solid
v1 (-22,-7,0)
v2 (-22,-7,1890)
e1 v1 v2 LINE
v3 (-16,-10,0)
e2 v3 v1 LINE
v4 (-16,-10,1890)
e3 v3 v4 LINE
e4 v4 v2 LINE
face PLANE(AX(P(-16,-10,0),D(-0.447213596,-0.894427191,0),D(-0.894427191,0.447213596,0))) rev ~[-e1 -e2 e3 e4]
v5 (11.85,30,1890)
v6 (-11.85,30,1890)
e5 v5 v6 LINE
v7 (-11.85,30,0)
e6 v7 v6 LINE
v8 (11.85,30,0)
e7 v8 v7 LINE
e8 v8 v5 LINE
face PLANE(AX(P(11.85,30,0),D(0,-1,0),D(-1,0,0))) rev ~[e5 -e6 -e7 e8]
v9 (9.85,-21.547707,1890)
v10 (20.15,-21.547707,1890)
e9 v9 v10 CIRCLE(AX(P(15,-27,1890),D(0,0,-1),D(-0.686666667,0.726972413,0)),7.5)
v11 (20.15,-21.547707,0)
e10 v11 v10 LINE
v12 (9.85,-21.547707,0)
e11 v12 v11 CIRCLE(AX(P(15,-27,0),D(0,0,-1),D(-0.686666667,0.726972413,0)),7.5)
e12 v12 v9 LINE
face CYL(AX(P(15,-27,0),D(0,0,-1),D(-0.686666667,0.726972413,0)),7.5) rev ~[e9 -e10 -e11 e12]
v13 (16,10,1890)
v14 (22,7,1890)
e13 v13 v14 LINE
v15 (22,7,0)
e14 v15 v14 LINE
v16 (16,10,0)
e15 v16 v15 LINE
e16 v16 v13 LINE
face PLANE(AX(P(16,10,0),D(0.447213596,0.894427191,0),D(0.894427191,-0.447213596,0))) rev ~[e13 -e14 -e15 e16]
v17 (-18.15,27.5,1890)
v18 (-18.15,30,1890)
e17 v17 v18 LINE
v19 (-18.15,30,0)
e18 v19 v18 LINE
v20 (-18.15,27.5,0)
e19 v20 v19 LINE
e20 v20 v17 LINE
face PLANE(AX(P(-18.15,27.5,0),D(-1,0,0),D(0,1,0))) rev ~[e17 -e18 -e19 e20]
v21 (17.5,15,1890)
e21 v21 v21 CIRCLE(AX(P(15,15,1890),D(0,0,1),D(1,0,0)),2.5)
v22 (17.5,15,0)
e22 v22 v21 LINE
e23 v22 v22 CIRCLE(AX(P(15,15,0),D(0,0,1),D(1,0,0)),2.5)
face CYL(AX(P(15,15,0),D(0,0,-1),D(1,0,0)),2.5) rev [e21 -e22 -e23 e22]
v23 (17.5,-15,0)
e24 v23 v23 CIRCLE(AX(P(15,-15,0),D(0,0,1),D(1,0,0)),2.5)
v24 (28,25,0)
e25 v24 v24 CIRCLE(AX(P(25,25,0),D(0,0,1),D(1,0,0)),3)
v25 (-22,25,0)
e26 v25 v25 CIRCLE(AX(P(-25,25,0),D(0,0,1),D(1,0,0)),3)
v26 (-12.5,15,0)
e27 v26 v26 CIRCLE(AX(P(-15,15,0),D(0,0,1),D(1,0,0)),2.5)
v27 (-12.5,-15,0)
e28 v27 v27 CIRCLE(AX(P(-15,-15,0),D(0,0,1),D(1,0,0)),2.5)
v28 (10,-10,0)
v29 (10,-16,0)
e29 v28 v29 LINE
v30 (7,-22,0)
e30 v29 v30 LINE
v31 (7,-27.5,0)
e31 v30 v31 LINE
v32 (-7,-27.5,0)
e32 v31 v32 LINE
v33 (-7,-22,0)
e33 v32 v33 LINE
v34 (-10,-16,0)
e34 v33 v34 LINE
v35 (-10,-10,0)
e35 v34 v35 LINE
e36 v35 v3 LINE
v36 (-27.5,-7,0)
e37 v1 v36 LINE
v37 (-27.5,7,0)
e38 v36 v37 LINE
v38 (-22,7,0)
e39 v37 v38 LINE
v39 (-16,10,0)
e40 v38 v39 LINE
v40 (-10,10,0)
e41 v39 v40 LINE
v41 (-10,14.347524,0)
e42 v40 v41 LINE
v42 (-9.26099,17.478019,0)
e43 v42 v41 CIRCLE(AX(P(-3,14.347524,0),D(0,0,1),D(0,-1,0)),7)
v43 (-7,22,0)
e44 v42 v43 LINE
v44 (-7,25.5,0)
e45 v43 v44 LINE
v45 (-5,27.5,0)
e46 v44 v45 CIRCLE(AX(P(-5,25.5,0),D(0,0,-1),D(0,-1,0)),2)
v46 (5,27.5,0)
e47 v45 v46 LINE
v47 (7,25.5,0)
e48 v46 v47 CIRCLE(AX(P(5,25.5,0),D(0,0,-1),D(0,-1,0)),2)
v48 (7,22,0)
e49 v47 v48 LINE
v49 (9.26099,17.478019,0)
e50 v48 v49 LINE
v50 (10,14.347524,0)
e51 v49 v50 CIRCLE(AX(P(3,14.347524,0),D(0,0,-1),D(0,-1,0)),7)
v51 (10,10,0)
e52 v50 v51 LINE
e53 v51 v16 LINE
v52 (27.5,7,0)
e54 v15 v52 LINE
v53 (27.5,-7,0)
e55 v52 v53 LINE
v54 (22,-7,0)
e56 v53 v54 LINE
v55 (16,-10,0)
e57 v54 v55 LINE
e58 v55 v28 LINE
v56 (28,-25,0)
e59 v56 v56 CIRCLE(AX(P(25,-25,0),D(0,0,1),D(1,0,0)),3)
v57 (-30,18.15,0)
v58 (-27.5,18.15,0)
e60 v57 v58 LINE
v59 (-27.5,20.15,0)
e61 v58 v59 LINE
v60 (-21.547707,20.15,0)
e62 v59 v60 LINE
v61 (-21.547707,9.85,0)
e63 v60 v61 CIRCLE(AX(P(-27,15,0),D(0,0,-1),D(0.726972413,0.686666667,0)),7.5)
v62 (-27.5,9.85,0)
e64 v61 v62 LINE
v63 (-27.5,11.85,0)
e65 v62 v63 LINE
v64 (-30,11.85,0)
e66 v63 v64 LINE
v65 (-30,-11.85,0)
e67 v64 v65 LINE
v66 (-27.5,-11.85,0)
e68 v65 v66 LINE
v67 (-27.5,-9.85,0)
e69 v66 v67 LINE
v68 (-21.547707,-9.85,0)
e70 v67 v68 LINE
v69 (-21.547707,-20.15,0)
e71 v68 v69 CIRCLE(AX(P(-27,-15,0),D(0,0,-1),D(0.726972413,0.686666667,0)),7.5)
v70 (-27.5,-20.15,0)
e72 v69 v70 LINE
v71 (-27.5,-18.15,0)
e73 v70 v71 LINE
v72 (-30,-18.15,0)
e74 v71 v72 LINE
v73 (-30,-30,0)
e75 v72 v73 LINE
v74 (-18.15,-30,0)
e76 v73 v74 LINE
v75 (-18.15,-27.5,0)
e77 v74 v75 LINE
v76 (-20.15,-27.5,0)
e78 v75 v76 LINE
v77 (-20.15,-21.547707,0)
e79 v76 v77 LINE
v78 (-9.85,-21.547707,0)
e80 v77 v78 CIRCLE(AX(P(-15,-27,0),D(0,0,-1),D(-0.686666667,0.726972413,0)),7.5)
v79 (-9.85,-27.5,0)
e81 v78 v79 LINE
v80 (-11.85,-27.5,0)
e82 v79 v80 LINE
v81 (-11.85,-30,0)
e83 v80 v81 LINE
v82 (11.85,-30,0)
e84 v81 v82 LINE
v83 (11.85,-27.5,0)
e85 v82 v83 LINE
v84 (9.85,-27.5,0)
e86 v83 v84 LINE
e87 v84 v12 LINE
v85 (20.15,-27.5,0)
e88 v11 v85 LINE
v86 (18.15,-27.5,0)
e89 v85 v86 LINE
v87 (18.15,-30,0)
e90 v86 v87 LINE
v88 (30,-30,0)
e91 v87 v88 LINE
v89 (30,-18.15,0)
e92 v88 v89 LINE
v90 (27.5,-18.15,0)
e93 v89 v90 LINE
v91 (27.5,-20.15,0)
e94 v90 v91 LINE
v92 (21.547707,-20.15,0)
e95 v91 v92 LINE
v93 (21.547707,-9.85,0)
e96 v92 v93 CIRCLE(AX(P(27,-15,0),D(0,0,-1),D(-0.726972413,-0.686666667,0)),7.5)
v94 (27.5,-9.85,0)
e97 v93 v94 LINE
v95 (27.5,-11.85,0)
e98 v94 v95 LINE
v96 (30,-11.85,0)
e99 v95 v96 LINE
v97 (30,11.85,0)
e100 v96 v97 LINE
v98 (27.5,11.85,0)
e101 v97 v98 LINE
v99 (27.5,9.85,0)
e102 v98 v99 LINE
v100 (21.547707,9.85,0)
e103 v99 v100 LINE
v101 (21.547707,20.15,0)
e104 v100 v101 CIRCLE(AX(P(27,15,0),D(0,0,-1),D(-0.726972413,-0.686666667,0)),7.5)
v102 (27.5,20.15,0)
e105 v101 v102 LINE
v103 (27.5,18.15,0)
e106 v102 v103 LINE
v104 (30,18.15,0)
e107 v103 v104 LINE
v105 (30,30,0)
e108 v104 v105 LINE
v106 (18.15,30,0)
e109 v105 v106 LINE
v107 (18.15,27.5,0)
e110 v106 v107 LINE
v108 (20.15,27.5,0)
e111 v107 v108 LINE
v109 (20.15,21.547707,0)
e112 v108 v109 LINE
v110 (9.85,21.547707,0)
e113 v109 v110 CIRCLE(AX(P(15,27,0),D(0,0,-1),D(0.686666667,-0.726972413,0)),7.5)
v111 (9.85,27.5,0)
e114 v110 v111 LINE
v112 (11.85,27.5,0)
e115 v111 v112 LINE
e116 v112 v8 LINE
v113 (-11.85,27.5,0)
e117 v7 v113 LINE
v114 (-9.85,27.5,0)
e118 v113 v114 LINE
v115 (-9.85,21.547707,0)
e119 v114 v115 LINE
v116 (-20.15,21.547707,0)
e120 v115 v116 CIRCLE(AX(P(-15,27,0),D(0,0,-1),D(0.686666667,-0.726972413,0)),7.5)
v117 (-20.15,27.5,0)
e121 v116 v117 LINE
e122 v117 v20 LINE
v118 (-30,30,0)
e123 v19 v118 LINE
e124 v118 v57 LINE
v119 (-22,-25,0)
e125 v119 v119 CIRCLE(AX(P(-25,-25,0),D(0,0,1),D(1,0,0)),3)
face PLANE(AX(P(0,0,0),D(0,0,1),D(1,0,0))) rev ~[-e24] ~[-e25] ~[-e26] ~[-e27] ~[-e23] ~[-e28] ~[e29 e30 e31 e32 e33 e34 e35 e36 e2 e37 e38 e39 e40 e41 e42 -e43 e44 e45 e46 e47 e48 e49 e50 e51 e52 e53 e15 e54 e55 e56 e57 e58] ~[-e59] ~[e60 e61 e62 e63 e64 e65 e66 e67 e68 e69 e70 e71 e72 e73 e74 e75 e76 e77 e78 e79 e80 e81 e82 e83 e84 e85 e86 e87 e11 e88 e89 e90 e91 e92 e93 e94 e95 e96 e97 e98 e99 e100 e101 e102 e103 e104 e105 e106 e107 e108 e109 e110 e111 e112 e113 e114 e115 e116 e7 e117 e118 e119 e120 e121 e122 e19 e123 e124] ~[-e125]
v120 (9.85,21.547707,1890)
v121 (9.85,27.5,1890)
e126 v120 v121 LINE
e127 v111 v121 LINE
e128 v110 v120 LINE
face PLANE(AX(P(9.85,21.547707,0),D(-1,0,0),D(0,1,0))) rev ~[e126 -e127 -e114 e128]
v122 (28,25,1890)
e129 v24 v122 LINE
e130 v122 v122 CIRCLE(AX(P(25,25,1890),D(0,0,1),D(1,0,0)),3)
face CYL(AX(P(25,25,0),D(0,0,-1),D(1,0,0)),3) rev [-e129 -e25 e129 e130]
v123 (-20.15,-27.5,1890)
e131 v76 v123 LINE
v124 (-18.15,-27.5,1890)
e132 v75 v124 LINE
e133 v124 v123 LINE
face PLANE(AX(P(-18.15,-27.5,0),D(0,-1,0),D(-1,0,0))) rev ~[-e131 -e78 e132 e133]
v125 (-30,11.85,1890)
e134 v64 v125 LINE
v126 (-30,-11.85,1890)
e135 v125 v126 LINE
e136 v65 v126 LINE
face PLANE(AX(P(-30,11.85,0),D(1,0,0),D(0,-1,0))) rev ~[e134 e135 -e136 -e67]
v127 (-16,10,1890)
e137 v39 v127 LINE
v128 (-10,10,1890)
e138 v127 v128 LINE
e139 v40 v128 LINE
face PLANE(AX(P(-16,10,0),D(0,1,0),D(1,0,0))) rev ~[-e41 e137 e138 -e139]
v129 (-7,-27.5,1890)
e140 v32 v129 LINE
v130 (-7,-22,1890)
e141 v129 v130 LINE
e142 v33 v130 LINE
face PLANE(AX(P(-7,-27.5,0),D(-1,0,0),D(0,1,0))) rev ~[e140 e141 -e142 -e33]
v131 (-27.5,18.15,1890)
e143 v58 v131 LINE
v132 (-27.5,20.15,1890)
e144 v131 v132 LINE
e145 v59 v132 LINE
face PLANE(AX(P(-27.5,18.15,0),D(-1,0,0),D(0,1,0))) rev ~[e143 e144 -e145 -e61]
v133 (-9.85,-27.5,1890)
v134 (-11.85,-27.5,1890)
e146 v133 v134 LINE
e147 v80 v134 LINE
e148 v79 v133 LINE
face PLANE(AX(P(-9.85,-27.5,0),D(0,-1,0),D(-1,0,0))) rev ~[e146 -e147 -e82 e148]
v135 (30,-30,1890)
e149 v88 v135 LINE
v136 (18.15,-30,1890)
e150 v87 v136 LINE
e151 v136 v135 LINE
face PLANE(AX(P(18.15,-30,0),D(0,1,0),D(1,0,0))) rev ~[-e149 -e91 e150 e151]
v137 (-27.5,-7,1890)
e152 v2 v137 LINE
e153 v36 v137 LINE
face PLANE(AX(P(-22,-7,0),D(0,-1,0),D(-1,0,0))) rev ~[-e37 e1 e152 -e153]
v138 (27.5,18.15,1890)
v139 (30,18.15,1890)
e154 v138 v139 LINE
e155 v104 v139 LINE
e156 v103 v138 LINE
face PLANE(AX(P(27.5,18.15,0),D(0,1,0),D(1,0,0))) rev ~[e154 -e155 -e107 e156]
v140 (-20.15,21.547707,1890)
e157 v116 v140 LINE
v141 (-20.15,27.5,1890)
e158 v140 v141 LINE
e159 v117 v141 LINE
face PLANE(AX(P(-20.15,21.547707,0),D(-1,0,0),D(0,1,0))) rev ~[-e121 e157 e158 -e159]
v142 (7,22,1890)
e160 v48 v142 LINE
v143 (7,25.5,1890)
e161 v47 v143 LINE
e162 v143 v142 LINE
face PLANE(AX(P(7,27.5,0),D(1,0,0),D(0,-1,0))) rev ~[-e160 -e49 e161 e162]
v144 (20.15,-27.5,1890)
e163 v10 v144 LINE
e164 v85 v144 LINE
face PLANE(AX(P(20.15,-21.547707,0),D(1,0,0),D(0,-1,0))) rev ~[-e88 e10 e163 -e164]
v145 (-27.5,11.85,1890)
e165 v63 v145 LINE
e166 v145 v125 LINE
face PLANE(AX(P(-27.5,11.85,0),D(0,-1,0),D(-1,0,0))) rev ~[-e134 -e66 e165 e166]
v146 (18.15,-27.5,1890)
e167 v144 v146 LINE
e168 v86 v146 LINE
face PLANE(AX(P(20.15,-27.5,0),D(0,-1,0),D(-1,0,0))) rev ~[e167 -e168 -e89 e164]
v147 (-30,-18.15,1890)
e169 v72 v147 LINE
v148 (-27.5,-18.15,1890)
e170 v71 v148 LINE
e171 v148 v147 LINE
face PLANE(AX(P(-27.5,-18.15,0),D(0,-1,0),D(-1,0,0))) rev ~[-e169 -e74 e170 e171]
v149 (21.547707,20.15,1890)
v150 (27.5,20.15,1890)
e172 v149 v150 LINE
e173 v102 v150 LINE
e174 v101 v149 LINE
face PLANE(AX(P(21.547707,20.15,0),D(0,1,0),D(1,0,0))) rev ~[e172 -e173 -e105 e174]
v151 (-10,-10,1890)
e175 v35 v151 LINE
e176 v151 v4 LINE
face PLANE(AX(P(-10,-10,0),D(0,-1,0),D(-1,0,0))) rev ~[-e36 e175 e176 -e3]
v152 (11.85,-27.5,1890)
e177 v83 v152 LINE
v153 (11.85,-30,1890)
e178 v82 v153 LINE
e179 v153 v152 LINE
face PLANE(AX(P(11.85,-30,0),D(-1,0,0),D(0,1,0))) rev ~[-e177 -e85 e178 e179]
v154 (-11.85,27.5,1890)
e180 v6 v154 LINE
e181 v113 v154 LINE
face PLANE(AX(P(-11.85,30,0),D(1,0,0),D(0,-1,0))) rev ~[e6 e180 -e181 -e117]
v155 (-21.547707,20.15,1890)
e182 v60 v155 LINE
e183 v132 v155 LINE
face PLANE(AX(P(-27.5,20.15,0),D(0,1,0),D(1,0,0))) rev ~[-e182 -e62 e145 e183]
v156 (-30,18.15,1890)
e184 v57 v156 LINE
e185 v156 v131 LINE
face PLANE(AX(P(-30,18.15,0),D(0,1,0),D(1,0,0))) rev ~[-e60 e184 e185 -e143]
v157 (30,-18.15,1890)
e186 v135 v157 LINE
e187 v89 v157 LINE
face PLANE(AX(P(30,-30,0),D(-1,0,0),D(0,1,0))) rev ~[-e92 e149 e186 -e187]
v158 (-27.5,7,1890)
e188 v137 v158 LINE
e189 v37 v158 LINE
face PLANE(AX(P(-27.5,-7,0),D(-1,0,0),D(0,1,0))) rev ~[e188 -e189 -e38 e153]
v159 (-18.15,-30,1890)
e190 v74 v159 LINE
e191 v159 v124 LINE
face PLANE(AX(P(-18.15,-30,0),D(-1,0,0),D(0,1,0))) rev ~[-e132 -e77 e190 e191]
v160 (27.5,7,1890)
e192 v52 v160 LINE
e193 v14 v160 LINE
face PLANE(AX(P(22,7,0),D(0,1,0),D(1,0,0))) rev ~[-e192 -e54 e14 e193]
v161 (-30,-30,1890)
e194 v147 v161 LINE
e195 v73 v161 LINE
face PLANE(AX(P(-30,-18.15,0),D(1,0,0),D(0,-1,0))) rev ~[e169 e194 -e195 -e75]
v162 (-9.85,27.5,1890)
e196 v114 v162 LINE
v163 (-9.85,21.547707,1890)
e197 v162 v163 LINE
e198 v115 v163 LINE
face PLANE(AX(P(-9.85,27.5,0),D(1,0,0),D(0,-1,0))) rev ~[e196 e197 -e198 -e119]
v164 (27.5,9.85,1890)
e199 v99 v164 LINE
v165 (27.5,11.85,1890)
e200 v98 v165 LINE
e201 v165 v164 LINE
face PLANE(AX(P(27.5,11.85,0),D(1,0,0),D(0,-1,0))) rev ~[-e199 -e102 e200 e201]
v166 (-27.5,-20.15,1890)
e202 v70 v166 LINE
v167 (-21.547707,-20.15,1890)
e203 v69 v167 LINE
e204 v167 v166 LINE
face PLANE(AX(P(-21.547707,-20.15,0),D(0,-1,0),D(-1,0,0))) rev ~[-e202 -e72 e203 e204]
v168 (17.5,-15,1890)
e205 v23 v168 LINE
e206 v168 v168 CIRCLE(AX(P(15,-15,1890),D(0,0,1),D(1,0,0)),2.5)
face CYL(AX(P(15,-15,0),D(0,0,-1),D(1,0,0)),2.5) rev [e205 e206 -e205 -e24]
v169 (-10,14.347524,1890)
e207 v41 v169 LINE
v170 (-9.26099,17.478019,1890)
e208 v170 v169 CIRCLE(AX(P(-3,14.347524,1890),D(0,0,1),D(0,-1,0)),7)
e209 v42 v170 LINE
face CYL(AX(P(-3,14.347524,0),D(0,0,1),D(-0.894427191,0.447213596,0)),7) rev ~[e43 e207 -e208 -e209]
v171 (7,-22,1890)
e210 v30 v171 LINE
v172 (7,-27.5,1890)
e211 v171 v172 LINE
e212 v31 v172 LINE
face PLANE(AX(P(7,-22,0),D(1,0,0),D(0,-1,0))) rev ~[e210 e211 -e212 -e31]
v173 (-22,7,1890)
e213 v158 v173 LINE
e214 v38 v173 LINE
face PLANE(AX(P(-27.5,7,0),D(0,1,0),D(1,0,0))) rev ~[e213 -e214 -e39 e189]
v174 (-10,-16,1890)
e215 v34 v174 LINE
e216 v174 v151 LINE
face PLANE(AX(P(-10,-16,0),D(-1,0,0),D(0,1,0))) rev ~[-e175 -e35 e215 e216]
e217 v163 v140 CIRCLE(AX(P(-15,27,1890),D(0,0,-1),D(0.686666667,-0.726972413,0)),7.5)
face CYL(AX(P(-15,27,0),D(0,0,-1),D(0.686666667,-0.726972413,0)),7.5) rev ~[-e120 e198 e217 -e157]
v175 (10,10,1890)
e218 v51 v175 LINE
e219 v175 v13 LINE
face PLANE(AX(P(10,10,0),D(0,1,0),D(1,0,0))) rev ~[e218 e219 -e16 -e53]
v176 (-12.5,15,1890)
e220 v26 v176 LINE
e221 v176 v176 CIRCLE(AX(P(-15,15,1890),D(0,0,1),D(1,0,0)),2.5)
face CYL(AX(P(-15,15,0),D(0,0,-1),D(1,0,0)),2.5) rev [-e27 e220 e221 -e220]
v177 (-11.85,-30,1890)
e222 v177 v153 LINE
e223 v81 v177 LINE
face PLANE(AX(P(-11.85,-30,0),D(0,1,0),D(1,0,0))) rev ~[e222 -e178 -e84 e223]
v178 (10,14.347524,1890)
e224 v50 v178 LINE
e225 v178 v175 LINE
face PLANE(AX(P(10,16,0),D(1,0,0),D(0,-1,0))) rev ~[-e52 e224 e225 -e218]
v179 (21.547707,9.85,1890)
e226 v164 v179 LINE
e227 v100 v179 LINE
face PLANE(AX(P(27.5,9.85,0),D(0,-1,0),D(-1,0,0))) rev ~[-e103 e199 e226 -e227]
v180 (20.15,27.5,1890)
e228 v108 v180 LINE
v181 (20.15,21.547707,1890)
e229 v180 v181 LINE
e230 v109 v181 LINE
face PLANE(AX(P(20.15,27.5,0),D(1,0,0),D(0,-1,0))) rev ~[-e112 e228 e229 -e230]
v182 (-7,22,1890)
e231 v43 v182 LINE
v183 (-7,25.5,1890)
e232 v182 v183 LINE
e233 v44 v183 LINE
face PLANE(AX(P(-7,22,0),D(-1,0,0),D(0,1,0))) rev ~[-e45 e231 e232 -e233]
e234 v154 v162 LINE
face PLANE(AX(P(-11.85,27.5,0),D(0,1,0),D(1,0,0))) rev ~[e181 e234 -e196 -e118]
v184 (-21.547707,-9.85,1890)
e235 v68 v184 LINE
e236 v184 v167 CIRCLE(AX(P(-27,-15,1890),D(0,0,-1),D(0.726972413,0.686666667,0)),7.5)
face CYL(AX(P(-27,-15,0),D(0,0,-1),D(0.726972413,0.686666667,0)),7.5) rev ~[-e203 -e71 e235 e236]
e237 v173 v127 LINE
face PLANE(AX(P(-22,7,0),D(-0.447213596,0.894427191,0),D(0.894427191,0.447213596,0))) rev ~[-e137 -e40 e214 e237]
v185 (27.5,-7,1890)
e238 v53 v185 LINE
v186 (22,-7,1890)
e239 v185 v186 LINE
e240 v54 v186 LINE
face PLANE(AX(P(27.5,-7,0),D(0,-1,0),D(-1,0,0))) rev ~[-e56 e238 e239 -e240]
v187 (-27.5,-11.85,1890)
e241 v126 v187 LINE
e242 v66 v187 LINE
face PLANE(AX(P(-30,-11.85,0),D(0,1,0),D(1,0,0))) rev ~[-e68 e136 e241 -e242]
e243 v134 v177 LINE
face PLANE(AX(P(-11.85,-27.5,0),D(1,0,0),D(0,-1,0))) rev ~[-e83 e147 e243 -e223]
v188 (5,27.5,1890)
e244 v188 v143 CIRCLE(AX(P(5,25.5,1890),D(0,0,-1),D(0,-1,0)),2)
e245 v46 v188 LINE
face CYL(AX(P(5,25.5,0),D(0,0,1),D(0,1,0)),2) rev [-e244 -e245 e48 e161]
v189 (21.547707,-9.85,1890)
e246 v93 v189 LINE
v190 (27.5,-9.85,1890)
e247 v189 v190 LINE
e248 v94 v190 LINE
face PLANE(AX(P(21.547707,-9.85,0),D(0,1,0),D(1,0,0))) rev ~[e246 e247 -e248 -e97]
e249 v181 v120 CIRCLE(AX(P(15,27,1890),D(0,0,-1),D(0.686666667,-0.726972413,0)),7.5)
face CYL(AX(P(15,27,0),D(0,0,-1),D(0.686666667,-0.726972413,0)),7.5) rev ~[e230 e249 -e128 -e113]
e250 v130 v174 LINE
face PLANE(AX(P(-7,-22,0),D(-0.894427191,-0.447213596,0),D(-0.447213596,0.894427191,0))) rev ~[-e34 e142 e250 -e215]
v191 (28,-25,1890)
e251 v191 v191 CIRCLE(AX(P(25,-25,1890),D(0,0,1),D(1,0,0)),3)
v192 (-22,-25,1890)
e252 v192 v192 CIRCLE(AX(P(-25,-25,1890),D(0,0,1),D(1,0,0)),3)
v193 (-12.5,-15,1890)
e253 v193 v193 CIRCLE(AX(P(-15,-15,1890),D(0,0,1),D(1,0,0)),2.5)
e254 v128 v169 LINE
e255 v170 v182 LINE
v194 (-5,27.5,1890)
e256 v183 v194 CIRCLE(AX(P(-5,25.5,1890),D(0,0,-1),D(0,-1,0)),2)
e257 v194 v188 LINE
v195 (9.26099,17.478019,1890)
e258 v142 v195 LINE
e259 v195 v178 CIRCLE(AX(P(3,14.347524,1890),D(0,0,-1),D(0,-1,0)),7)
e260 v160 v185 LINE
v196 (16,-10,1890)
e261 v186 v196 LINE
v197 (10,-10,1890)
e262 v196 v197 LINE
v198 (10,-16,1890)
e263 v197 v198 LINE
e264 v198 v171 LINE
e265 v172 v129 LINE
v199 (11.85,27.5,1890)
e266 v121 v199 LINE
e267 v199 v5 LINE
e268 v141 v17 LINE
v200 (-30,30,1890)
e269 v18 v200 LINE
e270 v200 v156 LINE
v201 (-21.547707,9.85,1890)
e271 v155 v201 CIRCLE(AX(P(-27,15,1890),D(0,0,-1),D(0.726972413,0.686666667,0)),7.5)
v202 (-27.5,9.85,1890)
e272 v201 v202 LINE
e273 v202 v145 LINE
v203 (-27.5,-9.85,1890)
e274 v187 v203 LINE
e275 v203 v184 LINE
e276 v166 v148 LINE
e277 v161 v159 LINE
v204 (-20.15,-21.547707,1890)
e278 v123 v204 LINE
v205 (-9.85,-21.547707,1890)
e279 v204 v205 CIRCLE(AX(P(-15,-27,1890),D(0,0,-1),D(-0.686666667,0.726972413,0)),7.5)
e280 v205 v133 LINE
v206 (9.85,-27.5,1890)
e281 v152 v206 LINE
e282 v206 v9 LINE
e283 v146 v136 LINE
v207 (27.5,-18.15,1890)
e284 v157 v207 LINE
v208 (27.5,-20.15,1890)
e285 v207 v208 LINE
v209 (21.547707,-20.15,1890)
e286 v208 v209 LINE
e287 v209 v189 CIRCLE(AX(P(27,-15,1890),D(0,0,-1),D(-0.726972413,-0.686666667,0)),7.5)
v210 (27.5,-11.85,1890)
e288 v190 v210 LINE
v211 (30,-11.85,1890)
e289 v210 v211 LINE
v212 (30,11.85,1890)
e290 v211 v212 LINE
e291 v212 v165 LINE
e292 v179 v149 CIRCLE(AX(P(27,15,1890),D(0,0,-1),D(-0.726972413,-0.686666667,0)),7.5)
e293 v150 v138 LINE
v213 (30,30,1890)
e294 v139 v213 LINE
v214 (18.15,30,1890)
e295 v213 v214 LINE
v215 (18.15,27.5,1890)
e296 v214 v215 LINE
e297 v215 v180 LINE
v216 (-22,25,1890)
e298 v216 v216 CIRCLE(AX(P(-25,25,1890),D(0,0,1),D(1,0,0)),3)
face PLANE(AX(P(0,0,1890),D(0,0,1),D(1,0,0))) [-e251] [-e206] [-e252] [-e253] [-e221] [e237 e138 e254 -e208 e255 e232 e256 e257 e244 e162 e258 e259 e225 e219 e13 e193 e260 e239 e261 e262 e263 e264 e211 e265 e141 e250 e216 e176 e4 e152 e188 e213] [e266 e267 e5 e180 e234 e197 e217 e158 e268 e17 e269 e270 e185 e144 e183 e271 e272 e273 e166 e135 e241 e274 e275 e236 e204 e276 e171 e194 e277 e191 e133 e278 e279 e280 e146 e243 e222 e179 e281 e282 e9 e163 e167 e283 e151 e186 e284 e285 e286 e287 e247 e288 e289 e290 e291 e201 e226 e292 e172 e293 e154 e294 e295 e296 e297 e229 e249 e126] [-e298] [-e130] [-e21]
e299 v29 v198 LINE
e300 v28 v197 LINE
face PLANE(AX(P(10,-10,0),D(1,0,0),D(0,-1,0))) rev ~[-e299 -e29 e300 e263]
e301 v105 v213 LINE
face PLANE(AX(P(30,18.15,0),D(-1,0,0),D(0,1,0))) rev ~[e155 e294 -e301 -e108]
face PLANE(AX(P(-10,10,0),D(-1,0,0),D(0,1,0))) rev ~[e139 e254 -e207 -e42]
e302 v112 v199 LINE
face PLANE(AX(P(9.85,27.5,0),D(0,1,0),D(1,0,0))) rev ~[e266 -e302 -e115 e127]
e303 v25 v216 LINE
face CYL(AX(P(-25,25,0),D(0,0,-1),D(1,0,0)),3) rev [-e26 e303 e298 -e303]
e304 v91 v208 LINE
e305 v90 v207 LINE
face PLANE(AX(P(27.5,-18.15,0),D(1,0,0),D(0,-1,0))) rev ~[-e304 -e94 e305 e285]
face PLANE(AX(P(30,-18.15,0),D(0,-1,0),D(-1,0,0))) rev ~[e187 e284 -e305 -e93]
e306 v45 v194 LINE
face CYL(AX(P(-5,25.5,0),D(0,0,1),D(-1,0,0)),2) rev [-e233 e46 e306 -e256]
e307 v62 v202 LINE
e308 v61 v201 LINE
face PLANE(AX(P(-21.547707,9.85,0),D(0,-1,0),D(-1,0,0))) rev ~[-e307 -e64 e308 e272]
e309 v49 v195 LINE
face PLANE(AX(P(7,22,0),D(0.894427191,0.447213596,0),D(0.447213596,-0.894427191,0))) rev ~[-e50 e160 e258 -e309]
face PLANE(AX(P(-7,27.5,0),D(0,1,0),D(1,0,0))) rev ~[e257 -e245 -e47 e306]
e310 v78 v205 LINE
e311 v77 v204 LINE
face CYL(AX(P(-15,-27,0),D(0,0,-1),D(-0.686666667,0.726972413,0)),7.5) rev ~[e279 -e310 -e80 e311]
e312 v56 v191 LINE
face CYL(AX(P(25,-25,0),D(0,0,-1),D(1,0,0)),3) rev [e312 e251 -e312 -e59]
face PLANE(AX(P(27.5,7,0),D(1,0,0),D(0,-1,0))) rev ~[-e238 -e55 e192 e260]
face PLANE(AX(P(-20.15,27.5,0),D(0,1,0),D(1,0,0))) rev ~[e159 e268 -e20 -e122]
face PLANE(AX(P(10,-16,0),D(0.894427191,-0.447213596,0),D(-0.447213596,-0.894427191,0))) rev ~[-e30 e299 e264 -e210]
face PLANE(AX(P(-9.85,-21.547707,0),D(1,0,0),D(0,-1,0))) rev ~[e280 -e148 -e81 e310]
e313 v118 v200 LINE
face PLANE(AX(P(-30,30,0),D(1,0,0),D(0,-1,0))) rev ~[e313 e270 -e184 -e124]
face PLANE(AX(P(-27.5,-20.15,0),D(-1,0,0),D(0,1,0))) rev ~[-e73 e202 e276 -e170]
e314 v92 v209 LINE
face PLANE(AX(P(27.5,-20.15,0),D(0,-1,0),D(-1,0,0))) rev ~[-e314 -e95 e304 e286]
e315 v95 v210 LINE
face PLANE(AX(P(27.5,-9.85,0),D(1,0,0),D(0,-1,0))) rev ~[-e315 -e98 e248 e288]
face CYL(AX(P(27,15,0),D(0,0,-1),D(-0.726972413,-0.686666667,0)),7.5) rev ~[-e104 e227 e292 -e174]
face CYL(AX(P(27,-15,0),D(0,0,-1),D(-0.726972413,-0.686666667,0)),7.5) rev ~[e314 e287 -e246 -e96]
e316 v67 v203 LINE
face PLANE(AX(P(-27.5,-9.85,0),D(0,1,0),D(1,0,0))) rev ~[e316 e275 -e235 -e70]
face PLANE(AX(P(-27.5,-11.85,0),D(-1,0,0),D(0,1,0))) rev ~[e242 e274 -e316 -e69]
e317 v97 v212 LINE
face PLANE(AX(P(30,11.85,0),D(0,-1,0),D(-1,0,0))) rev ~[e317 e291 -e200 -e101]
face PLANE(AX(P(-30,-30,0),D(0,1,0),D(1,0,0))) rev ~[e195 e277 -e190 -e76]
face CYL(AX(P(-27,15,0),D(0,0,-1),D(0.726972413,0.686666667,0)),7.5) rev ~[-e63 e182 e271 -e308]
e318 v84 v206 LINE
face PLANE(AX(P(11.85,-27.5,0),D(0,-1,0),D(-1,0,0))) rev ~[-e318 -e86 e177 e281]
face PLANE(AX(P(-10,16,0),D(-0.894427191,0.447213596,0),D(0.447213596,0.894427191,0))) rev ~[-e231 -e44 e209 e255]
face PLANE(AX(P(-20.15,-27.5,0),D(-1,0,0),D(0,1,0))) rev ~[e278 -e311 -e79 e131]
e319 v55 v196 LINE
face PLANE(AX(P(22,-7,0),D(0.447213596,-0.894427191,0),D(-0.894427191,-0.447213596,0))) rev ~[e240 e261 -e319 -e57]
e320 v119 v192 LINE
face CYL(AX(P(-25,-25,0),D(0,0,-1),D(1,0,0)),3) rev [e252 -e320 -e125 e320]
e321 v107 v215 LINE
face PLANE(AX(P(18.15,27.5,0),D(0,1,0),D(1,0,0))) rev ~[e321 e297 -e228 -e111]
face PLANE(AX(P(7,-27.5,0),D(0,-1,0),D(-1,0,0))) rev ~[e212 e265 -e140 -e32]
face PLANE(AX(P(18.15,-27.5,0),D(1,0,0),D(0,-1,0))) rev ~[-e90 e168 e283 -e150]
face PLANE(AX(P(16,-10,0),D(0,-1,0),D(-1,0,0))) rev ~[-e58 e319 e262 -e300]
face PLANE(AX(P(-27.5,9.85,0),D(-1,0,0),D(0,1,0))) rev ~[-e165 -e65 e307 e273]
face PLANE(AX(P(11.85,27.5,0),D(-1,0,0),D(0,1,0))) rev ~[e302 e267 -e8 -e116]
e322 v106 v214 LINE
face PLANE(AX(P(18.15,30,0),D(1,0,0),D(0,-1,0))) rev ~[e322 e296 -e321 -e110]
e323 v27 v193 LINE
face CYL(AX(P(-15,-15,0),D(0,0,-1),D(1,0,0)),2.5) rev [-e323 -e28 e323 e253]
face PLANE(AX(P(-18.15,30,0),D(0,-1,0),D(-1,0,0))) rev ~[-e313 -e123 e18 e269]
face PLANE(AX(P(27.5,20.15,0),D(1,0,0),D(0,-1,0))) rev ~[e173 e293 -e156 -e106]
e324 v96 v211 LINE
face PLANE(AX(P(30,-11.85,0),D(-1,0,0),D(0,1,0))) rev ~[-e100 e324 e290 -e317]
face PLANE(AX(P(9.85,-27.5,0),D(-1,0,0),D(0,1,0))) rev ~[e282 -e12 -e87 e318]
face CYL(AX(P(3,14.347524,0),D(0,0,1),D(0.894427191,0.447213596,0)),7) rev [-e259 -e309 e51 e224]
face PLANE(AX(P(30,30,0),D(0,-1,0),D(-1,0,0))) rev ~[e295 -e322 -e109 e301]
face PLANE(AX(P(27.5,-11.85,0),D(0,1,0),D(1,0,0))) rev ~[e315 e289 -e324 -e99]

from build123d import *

# Parameters (mm, degrees)
F0_R     = 3
F0_R_2   = 2.5
F1_DEPTH = 1890
F2_R     = 2
F3_R     = 7


# Not quite as in the source:
# - a feature names something its author has since deleted; it is built from what else it names


with BuildPart() as f1:
    # F0 (on Top) → F1 (new body)
    with BuildSketch(Plane.XY):
        with BuildLine():
            Line((18.15, -30), (30, -30))
            Line((30, -30), (30, -18.15))
            Line((30, -18.15), (27.5, -18.15))
            Line((27.5, -18.15), (27.5, -20.15))
            Line((27.5, -20.15), (21.5477069044, -20.15))
            ThreePointArc((21.5477069044, -20.15), (19.5, -15), (21.5477069044, -9.85))
            Line((21.5477069044, -9.85), (27.5, -9.85))
            Line((27.5, -9.85), (27.5, -11.85))
            Line((27.5, -11.85), (30, -11.85))
            Line((30, -11.85), (30, 11.85))
            Line((30, 11.85), (27.5, 11.85))
            Line((27.5, 11.85), (27.5, 9.85))
            Line((27.5, 9.85), (21.5477069044, 9.85))
            ThreePointArc((21.5477069044, 9.85), (19.5, 15), (21.5477069044, 20.15))
            Line((21.5477069044, 20.15), (27.5, 20.15))
            Line((27.5, 20.15), (27.5, 18.15))
            Line((27.5, 18.15), (30, 18.15))
            Line((30, 18.15), (30, 30))
            Line((30, 30), (18.15, 30))
            Line((18.15, 30), (18.15, 27.5))
            Line((18.15, 27.5), (20.15, 27.5))
            Line((20.15, 27.5), (20.15, 21.5477069044))
            ThreePointArc((20.15, 21.5477069044), (15, 19.5), (9.85, 21.5477069044))
            Line((9.85, 21.5477069044), (9.85, 27.5))
            Line((9.85, 27.5), (11.85, 27.5))
            Line((11.85, 27.5), (11.85, 30))
            Line((11.85, 30), (-11.85, 30))
            Line((-11.85, 30), (-11.85, 27.5))
            Line((-11.85, 27.5), (-9.85, 27.5))
            Line((-9.85, 27.5), (-9.85, 21.5477069044))
            ThreePointArc((-9.85, 21.5477069044), (-15, 19.5), (-20.15, 21.5477069044))
            Line((-20.15, 21.5477069044), (-20.15, 27.5))
            Line((-20.15, 27.5), (-18.15, 27.5))
            Line((-18.15, 27.5), (-18.15, 30))
            Line((-18.15, 30), (-30, 30))
            Line((-30, 30), (-30, 18.15))
            Line((-30, 18.15), (-27.5, 18.15))
            Line((-27.5, 18.15), (-27.5, 20.15))
            Line((-27.5, 20.15), (-21.5477069044, 20.15))
            ThreePointArc((-21.5477069044, 20.15), (-19.5, 15), (-21.5477069044, 9.85))
            Line((-21.5477069044, 9.85), (-27.5, 9.85))
            Line((-27.5, 9.85), (-27.5, 11.85))
            Line((-27.5, 11.85), (-30, 11.85))
            Line((-30, 11.85), (-30, -11.85))
            Line((-30, -11.85), (-27.5, -11.85))
            Line((-27.5, -11.85), (-27.5, -9.85))
            Line((-27.5, -9.85), (-21.5477069044, -9.85))
            ThreePointArc((-21.5477069044, -9.85), (-19.5, -15), (-21.5477069044, -20.15))
            Line((-21.5477069044, -20.15), (-27.5, -20.15))
            Line((-27.5, -20.15), (-27.5, -18.15))
            Line((-27.5, -18.15), (-30, -18.15))
            Line((-30, -18.15), (-30, -30))
            Line((-30, -30), (-18.15, -30))
            Line((-18.15, -30), (-18.15, -27.5))
            Line((-18.15, -27.5), (-20.15, -27.5))
            Line((-20.15, -27.5), (-20.15, -21.5477069044))
            ThreePointArc((-20.15, -21.5477069044), (-15, -19.5), (-9.85, -21.5477069044))
            Line((-9.85, -21.5477069044), (-9.85, -27.5))
            Line((-9.85, -27.5), (-11.85, -27.5))
            Line((-11.85, -27.5), (-11.85, -30))
            Line((-11.85, -30), (11.85, -30))
            Line((11.85, -30), (11.85, -27.5))
            Line((11.85, -27.5), (9.85, -27.5))
            Line((9.85, -27.5), (9.85, -21.5477069044))
            ThreePointArc((9.85, -21.5477069044), (15, -19.5), (20.15, -21.5477069044))
            Line((20.15, -21.5477069044), (20.15, -27.5))
            Line((20.15, -27.5), (18.15, -27.5))
            Line((18.15, -27.5), (18.15, -30))
        make_face()
        with Locations((-25, -25)):
            Circle(F0_R, mode=Mode.SUBTRACT)
        with Locations((-15, -15)):
            Circle(F0_R_2, mode=Mode.SUBTRACT)
        with Locations((25, -25)):
            Circle(F0_R, mode=Mode.SUBTRACT)
        with Locations((15, -15)):
            Circle(F0_R_2, mode=Mode.SUBTRACT)
        with Locations((-25, 25)):
            Circle(F0_R, mode=Mode.SUBTRACT)
        with Locations((-15, 15)):
            Circle(F0_R_2, mode=Mode.SUBTRACT)
        Polygon((-7, 22), (-7, 27.5), (0, 27.5), (7, 27.5), (7, 22), (10, 16), (10, 10), (16, 10), (22, 7), (27.5, 7), (27.5, 0), (27.5, -7), (22, -7), (16, -10), (10, -10), (10, -16), (7, -22), (7, -27.5), (0, -27.5), (-7, -27.5), (-7, -22), (-10, -16), (-10, -10), (-16, -10), (-22, -7), (-27.5, -7), (-27.5, 0), (-27.5, 7), (-22, 7), (-16, 10), (-10, 10), (-10, 16), align=None, mode=Mode.SUBTRACT)
        with Locations((15, 15)):
            Circle(F0_R_2, mode=Mode.SUBTRACT)
        with Locations((25, 25)):
            Circle(F0_R, mode=Mode.SUBTRACT)
    extrude(amount=F1_DEPTH)

    # F2
    f2_edges = [f1.edges().sort_by_distance(p)[0] for p in [
        (-7, 27.5, 945),
        (7, 27.5, 945),
    ]]
    fillet(f2_edges, radius=F2_R)

    # F3
    f3_edges = [f1.edges().sort_by_distance(p)[0] for p in [
        (-10, 16, 945),
        (10, 16, 945),
    ]]
    fillet(f3_edges, radius=F3_R)


solid = f1.part
